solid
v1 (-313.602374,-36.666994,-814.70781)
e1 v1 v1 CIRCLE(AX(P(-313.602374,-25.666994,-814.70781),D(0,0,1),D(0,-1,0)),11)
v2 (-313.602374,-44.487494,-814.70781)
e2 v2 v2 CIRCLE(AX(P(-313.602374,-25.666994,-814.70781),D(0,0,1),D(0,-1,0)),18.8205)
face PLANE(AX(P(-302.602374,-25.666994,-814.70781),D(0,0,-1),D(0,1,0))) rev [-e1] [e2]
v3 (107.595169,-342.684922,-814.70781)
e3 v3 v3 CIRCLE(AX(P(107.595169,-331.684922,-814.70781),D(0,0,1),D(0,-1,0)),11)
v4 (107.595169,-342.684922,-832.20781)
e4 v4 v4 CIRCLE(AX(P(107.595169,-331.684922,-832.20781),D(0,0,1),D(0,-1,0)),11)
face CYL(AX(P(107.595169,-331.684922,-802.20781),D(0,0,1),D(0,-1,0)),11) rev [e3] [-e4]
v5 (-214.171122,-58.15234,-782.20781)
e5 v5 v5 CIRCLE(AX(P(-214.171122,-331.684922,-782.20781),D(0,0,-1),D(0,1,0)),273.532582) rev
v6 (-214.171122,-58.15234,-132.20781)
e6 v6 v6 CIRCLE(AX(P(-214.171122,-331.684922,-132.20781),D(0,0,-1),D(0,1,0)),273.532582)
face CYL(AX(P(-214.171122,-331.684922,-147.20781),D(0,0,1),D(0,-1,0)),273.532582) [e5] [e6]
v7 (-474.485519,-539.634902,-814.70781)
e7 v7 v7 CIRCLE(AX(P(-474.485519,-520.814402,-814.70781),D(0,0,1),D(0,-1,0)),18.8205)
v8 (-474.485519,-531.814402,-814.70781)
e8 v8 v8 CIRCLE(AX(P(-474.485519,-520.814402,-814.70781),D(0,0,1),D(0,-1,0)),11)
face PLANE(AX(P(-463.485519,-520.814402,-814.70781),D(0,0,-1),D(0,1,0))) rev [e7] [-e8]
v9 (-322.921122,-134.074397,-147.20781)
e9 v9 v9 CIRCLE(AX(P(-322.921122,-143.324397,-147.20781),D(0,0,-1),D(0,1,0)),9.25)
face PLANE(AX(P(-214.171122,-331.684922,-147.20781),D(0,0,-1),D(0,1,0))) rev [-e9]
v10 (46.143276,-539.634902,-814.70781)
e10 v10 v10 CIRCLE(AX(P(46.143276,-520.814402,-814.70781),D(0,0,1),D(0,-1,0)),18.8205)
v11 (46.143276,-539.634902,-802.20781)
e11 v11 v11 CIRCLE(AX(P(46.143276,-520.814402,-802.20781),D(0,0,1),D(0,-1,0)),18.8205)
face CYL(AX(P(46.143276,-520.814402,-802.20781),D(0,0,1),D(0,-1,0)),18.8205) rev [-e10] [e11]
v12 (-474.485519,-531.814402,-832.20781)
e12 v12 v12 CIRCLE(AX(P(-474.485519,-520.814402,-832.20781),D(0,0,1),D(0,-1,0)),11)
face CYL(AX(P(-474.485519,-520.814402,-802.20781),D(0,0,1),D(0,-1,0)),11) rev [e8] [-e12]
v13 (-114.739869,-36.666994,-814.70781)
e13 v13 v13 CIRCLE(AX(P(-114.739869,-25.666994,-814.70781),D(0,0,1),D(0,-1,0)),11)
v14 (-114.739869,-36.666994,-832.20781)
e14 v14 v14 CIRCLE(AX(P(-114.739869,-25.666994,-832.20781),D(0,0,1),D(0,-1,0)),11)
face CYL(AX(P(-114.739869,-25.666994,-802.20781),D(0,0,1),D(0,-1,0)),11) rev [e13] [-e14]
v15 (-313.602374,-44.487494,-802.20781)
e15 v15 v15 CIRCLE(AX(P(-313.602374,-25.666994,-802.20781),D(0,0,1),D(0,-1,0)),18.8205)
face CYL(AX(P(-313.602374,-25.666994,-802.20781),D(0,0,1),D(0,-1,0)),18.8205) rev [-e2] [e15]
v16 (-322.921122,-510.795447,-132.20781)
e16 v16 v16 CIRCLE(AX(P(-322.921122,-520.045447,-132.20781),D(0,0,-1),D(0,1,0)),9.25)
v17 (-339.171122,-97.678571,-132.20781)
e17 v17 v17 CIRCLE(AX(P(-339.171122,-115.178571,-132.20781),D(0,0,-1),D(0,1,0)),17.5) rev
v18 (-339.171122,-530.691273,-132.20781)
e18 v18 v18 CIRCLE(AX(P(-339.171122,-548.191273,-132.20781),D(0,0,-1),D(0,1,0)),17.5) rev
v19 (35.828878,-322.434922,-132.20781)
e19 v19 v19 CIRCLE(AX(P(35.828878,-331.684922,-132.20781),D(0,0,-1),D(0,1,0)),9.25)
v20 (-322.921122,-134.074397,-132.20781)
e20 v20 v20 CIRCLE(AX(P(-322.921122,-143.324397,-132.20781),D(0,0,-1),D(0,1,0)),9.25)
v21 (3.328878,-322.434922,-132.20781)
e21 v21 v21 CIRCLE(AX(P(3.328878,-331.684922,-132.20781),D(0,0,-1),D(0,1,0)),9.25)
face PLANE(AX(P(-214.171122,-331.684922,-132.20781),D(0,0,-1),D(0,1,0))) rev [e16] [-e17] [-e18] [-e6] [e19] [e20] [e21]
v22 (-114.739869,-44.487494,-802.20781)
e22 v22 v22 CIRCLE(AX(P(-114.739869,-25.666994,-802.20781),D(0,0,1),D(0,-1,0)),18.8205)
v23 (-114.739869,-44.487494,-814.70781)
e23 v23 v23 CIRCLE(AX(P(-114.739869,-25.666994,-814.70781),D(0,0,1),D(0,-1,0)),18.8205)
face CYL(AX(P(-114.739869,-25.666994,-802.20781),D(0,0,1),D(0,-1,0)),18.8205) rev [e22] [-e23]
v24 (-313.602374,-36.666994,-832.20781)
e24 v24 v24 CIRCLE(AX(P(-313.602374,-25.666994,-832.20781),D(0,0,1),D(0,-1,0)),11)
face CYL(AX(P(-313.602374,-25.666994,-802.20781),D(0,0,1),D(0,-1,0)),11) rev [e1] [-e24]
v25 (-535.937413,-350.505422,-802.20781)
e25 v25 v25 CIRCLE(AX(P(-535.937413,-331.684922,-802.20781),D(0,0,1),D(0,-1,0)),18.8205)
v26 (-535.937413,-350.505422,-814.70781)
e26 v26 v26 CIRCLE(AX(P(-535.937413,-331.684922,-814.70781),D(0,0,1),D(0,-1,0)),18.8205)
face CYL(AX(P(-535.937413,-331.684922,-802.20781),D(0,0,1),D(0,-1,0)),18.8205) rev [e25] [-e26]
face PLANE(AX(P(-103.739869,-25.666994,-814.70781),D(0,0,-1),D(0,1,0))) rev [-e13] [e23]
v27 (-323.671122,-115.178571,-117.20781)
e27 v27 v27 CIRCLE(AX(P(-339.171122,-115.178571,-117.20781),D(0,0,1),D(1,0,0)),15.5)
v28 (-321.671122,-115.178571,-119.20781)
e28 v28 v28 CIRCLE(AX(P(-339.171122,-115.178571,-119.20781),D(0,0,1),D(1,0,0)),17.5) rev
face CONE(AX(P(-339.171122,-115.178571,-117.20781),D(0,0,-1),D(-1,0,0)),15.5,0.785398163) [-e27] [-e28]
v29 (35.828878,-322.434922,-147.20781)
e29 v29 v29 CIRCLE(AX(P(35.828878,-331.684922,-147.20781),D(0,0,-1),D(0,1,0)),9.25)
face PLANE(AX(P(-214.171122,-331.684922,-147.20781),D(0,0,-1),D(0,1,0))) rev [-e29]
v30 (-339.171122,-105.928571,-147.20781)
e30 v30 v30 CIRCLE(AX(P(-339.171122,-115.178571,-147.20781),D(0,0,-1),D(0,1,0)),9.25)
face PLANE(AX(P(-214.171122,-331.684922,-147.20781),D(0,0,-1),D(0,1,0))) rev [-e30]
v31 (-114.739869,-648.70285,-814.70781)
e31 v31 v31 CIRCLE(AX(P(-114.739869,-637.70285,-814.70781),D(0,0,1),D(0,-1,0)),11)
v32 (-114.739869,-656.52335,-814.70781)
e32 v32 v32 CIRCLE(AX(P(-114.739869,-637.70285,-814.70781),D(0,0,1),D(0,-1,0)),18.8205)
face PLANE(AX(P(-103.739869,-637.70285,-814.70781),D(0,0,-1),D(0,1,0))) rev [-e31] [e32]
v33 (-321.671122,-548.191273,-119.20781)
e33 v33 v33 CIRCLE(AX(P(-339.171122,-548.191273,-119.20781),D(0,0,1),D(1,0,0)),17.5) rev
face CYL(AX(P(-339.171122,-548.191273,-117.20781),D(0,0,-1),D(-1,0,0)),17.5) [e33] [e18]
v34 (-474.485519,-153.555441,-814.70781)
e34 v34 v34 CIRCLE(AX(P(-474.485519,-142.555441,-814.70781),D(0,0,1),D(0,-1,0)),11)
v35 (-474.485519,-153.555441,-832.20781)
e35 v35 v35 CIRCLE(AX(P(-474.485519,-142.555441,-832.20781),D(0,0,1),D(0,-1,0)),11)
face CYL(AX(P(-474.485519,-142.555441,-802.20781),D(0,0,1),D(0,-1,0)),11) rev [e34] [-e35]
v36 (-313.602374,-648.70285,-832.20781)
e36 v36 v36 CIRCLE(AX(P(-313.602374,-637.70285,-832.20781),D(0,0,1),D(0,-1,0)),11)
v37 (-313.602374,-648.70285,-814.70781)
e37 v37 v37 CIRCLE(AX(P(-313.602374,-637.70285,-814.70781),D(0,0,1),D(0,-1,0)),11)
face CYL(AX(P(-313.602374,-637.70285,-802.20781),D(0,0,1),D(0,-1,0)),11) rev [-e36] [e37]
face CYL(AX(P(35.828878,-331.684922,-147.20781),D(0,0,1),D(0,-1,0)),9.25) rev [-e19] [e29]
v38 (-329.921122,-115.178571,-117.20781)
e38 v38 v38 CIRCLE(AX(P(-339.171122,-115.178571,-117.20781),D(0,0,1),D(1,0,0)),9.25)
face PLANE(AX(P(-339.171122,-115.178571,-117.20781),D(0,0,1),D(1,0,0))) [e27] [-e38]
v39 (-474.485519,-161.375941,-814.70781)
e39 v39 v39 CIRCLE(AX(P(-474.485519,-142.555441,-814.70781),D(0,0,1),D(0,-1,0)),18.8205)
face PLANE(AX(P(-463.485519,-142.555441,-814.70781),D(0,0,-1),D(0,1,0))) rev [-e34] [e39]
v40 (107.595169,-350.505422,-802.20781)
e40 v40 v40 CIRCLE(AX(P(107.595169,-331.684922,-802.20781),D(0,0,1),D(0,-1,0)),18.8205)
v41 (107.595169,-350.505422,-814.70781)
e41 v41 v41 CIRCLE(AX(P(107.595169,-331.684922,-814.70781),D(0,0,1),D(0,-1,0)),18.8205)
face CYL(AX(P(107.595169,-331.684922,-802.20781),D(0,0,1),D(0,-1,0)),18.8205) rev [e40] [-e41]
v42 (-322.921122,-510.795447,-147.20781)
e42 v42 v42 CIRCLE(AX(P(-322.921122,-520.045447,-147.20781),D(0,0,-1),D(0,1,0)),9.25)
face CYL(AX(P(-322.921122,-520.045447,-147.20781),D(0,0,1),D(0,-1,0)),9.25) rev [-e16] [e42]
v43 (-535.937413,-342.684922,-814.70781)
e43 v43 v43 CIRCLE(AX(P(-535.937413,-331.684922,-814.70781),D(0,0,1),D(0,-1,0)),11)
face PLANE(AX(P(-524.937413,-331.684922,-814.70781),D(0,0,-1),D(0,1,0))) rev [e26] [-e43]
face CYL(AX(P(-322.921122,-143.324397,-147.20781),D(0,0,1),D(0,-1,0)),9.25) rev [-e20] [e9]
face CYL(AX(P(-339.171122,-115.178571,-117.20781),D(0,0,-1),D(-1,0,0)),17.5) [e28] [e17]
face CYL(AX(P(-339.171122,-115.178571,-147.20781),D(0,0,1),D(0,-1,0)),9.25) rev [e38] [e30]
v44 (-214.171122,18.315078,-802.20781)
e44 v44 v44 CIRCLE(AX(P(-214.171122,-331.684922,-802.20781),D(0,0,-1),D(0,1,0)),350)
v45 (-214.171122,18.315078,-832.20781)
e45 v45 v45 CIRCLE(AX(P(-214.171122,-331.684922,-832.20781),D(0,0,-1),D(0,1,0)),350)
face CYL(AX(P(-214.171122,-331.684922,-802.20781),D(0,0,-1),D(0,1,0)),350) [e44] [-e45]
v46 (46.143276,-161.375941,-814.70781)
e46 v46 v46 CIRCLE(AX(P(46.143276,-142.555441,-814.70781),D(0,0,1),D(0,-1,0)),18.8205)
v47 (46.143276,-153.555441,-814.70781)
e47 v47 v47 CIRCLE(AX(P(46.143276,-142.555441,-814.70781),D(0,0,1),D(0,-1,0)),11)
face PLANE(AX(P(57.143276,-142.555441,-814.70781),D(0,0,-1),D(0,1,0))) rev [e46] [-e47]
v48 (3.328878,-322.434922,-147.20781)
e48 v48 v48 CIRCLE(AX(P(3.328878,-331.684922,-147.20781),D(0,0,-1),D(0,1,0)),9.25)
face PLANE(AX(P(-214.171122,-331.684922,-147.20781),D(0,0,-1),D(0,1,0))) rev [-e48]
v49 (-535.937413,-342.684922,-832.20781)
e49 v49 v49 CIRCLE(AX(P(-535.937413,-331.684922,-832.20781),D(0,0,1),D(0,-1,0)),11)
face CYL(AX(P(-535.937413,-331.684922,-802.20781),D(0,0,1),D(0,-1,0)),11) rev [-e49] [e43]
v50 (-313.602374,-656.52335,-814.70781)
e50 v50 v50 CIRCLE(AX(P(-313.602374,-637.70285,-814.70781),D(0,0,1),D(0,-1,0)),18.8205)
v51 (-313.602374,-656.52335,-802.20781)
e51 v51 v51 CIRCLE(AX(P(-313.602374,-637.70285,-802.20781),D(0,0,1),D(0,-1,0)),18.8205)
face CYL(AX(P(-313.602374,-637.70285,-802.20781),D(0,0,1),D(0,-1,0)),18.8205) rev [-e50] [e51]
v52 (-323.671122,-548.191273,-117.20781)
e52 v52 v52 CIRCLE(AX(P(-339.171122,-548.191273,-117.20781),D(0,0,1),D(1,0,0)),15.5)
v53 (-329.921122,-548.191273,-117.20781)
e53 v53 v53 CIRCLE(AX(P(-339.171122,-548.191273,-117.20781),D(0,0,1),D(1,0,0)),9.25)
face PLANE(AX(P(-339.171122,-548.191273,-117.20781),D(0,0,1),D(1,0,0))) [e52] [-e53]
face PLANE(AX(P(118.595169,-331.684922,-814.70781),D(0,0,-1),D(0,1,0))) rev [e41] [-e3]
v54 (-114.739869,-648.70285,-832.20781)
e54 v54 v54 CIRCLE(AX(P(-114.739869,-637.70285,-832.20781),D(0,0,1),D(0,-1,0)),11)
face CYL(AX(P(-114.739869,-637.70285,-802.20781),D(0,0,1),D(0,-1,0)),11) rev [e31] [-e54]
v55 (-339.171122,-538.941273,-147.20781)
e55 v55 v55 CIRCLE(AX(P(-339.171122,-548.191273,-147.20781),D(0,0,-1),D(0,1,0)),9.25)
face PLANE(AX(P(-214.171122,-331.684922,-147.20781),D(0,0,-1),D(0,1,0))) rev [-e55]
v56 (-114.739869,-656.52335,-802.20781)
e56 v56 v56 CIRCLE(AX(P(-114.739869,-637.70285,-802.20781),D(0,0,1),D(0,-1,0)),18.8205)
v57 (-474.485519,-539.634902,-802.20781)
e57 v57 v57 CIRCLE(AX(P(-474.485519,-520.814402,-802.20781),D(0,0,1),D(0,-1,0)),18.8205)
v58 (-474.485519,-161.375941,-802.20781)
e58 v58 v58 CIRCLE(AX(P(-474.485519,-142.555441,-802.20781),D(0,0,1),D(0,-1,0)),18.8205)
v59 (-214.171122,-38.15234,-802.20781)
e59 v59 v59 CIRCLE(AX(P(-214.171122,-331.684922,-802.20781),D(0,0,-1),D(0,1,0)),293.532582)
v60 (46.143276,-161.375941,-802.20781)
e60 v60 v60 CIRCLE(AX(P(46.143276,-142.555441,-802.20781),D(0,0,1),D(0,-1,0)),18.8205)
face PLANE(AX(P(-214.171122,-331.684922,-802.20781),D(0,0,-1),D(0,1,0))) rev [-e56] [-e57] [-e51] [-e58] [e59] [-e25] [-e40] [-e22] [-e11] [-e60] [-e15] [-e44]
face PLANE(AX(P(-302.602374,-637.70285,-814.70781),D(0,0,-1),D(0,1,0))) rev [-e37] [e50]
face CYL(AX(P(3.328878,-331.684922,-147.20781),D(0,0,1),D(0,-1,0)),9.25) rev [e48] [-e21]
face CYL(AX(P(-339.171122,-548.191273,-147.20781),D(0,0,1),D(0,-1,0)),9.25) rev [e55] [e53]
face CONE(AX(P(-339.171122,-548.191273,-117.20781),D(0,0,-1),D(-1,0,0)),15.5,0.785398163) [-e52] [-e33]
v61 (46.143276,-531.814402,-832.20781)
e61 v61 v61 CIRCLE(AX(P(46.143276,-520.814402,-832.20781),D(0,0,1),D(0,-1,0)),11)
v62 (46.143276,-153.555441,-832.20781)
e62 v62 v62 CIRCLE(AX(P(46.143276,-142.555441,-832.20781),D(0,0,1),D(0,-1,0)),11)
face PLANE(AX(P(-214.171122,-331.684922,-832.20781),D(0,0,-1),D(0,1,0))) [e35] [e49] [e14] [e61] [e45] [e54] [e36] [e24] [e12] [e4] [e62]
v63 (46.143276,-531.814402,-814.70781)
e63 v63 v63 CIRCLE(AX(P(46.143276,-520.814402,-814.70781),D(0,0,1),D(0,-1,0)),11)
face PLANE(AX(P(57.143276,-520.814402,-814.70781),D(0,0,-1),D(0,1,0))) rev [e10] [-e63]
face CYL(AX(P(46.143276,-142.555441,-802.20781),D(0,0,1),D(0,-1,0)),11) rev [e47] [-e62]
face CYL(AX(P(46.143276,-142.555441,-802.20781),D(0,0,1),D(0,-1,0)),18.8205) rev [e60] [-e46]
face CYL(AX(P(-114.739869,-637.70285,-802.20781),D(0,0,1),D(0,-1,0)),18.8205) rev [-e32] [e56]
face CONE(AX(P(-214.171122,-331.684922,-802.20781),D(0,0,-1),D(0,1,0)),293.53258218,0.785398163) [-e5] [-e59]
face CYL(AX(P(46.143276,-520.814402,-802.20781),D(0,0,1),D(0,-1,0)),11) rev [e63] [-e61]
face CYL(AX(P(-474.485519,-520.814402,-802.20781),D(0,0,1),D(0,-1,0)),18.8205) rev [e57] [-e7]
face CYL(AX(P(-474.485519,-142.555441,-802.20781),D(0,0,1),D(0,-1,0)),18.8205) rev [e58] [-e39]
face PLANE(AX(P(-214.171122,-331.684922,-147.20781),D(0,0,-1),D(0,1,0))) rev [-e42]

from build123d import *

# Parameters (mm, degrees)
SCHIZZO1_R                                           = 273.53258218
ESTRUSIONE_ESTRUSIONE1_DEPTH                         = 15
SCHIZZO5_R                                           = 273.53258218
ESTRUSIONE_ESTRUSIONE4_DEPTH                         = 685
SCHIZZO6_R                                           = 350
ESTRUSIONE_ESTRUSIONE5_DEPTH                         = 30
SMUSSO2_SIZE                                         = 20
FORO_LAMATO_PER_BULLONE_M20_A_TESTA_ESAG_D           = 22
FORO_LAMATO_PER_BULLONE_M20_A_TESTA_ESAG_CBORE_D     = 37.641
FORO_LAMATO_PER_BULLONE_M20_A_TESTA_ESAG_CBORE_DEPTH = 12.5
RIPETIZIONECIRCOLARE1_COUNT                          = 10
ESTRUSIONE_ESTRUSIONE6_START                         = 15
SCHIZZO10_R                                          = 9.25
ESTRUSIONE_ESTRUSIONE6_DEPTH                         = 15


with BuildPart() as part:
    # Schizzo1 → Estrusione-Estrusione1 (new body)
    with BuildSketch(Plane(origin=(0, 0, -132.207810149), x_dir=(-1, 0, 0), z_dir=(0, 0, -1))):
        with Locations(Location((214.171121607, -331.684921883, 0), (0, 0, 90))):
            Circle(SCHIZZO1_R)
        with BuildLine():
            ThreePointArc((-35.828878393, -322.434921883), (-45.078878393, -331.684921883), (-35.828878393, -340.934921883))
            ThreePointArc((-35.828878393, -340.934921883), (-26.578878393, -331.684921883), (-35.828878393, -322.434921883))
        make_face(mode=Mode.SUBTRACT)
        with BuildLine():
            ThreePointArc((-3.328878393, -340.934921883), (5.921121607, -331.684921883), (-3.328878393, -322.434921883))
            ThreePointArc((-3.328878393, -322.434921883), (-12.578878393, -331.684921883), (-3.328878393, -340.934921883))
        make_face(mode=Mode.SUBTRACT)
        with BuildLine():
            ThreePointArc((322.921121607, -134.074396559), (313.671121607, -143.324396559), (322.921121607, -152.574396559))
            ThreePointArc((322.921121607, -152.574396559), (332.171121607, -143.324396559), (322.921121607, -134.074396559))
        make_face(mode=Mode.SUBTRACT)
        with BuildLine():
            ThreePointArc((339.171121607, -124.428570936), (348.421121607, -115.178570936), (339.171121607, -105.928570936))
            ThreePointArc((339.171121607, -105.928570936), (329.921121607, -115.178570936), (339.171121607, -124.428570936))
        make_face(mode=Mode.SUBTRACT)
        with BuildLine():
            ThreePointArc((322.921121607, -529.295447206), (332.171121607, -520.045447206), (322.921121607, -510.795447206))
            ThreePointArc((322.921121607, -510.795447206), (313.671121607, -520.045447206), (322.921121607, -529.295447206))
        make_face(mode=Mode.SUBTRACT)
        with BuildLine():
            ThreePointArc((339.171121607, -557.441272829), (348.421121607, -548.191272829), (339.171121607, -538.941272829))
            ThreePointArc((339.171121607, -538.941272829), (329.921121607, -548.191272829), (339.171121607, -557.441272829))
        make_face(mode=Mode.SUBTRACT)
    extrude(amount=ESTRUSIONE_ESTRUSIONE1_DEPTH)

    # Schizzo5 → Estrusione-Estrusione4 (add)
    with BuildSketch(Plane(origin=(0, 0, -147.207810149), x_dir=(-1, 0, 0), z_dir=(0, 0, -1))):
        with Locations(Location((214.171121607, -331.684921883, 0), (0, 0, 90))):
            Circle(SCHIZZO5_R)
    extrude(amount=ESTRUSIONE_ESTRUSIONE4_DEPTH)

    # Schizzo6 → Estrusione-Estrusione5 (add)
    with BuildSketch(Plane(origin=(0, 0, -832.207810149), x_dir=(-1, 0, 0), z_dir=(0, 0, -1))):
        with Locations(Location((214.171121607, -331.684921883, 0), (0, 0, 90))):
            Circle(SCHIZZO6_R)
    extrude(amount=-ESTRUSIONE_ESTRUSIONE5_DEPTH)

    # Smusso2
    smusso2_edges = [part.edges().sort_by_distance(p)[0] for p in [
        (-214.171121607, -605.217504063, -802.207810149),
    ]]
    chamfer(smusso2_edges, length=SMUSSO2_SIZE)

    # Foro lamato per Bullone M20 a testa esagonale-1 (through all)
    with Locations(Plane(origin=(107.595169483, -331.684921883, -802.207810149), x_dir=(0, 1, 0), z_dir=(0, 0, 1))):
        with Locations((0, 0)):
            foro_lamato_per_bullone_m20_a_testa_esag = CounterBoreHole(FORO_LAMATO_PER_BULLONE_M20_A_TESTA_ESAG_D / 2, FORO_LAMATO_PER_BULLONE_M20_A_TESTA_ESAG_CBORE_D / 2, FORO_LAMATO_PER_BULLONE_M20_A_TESTA_ESAG_CBORE_DEPTH)

    # RipetizioneCircolare1: Foro lamato per Bullone M20 a testa esagonale-1 ×10 about axis
    ripetizionecircolare1_axis = Axis((-214.171121607, -331.684921883, 0), (0, 0, 1))
    for i in range(1, RIPETIZIONECIRCOLARE1_COUNT):
        add(foro_lamato_per_bullone_m20_a_testa_esag.rotate(ripetizionecircolare1_axis, i * 360 / RIPETIZIONECIRCOLARE1_COUNT), mode=Mode.SUBTRACT)

    # Schizzo10 → Estrusione-Estrusione6 (add)
    # profile 1 of 2: a face of its own
    with BuildSketch(Plane.XY.offset(-132.207810149).offset(ESTRUSIONE_ESTRUSIONE6_START)):
        with BuildLine():
            ThreePointArc((-339.171121607, -132.678570936), (-321.671121607, -115.178570936), (-339.171121607, -97.678570936))
            ThreePointArc((-339.171121607, -97.678570936), (-356.671121607, -115.178570936), (-339.171121607, -132.678570936))
        make_face()
        with Locations((-339.171121607, -115.178570936)):
            Circle(SCHIZZO10_R, mode=Mode.SUBTRACT)
    # profile 2 of 2: a face of its own
    with BuildSketch(Plane.XY.offset(-132.207810149).offset(ESTRUSIONE_ESTRUSIONE6_START)):
        with BuildLine():
            ThreePointArc((-339.171121607, -565.691272829), (-321.671121607, -548.191272829), (-339.171121607, -530.691272829))
            ThreePointArc((-339.171121607, -530.691272829), (-356.671121607, -548.191272829), (-339.171121607, -565.691272829))
        make_face()
        with Locations((-339.171121607, -548.191272829)):
            Circle(SCHIZZO10_R, mode=Mode.SUBTRACT)
    extrude(amount=-ESTRUSIONE_ESTRUSIONE6_DEPTH)

    # Smusso3: read off the stored shape, not the designer's step
    # Smusso3 outline → Smusso3 (revolve, cut)
    with BuildSketch(Plane(origin=(-339.171121607, -115.178570936, 0), x_dir=(1, 0, 0), z_dir=(0, -1, 0))):
        Polygon((17.5, -117.207810149), (15.5, -117.207810149), (17.5, -119.207810149), align=None)
    revolve(axis=Axis((-339.171121607, -115.178570936, 0), (0, 0, 1)), mode=Mode.SUBTRACT)

    # Smusso3 2 outline → Smusso3 2 (revolve, cut)
    with BuildSketch(Plane(origin=(-339.171121607, -548.191272829, 0), x_dir=(1, 0, 0), z_dir=(0, -1, 0))):
        Polygon((17.5, -117.207810149), (15.5, -117.207810149), (17.5, -119.207810149), align=None)
    revolve(axis=Axis((-339.171121607, -548.191272829, 0), (0, 0, 1)), mode=Mode.SUBTRACT)


solid = part.part
